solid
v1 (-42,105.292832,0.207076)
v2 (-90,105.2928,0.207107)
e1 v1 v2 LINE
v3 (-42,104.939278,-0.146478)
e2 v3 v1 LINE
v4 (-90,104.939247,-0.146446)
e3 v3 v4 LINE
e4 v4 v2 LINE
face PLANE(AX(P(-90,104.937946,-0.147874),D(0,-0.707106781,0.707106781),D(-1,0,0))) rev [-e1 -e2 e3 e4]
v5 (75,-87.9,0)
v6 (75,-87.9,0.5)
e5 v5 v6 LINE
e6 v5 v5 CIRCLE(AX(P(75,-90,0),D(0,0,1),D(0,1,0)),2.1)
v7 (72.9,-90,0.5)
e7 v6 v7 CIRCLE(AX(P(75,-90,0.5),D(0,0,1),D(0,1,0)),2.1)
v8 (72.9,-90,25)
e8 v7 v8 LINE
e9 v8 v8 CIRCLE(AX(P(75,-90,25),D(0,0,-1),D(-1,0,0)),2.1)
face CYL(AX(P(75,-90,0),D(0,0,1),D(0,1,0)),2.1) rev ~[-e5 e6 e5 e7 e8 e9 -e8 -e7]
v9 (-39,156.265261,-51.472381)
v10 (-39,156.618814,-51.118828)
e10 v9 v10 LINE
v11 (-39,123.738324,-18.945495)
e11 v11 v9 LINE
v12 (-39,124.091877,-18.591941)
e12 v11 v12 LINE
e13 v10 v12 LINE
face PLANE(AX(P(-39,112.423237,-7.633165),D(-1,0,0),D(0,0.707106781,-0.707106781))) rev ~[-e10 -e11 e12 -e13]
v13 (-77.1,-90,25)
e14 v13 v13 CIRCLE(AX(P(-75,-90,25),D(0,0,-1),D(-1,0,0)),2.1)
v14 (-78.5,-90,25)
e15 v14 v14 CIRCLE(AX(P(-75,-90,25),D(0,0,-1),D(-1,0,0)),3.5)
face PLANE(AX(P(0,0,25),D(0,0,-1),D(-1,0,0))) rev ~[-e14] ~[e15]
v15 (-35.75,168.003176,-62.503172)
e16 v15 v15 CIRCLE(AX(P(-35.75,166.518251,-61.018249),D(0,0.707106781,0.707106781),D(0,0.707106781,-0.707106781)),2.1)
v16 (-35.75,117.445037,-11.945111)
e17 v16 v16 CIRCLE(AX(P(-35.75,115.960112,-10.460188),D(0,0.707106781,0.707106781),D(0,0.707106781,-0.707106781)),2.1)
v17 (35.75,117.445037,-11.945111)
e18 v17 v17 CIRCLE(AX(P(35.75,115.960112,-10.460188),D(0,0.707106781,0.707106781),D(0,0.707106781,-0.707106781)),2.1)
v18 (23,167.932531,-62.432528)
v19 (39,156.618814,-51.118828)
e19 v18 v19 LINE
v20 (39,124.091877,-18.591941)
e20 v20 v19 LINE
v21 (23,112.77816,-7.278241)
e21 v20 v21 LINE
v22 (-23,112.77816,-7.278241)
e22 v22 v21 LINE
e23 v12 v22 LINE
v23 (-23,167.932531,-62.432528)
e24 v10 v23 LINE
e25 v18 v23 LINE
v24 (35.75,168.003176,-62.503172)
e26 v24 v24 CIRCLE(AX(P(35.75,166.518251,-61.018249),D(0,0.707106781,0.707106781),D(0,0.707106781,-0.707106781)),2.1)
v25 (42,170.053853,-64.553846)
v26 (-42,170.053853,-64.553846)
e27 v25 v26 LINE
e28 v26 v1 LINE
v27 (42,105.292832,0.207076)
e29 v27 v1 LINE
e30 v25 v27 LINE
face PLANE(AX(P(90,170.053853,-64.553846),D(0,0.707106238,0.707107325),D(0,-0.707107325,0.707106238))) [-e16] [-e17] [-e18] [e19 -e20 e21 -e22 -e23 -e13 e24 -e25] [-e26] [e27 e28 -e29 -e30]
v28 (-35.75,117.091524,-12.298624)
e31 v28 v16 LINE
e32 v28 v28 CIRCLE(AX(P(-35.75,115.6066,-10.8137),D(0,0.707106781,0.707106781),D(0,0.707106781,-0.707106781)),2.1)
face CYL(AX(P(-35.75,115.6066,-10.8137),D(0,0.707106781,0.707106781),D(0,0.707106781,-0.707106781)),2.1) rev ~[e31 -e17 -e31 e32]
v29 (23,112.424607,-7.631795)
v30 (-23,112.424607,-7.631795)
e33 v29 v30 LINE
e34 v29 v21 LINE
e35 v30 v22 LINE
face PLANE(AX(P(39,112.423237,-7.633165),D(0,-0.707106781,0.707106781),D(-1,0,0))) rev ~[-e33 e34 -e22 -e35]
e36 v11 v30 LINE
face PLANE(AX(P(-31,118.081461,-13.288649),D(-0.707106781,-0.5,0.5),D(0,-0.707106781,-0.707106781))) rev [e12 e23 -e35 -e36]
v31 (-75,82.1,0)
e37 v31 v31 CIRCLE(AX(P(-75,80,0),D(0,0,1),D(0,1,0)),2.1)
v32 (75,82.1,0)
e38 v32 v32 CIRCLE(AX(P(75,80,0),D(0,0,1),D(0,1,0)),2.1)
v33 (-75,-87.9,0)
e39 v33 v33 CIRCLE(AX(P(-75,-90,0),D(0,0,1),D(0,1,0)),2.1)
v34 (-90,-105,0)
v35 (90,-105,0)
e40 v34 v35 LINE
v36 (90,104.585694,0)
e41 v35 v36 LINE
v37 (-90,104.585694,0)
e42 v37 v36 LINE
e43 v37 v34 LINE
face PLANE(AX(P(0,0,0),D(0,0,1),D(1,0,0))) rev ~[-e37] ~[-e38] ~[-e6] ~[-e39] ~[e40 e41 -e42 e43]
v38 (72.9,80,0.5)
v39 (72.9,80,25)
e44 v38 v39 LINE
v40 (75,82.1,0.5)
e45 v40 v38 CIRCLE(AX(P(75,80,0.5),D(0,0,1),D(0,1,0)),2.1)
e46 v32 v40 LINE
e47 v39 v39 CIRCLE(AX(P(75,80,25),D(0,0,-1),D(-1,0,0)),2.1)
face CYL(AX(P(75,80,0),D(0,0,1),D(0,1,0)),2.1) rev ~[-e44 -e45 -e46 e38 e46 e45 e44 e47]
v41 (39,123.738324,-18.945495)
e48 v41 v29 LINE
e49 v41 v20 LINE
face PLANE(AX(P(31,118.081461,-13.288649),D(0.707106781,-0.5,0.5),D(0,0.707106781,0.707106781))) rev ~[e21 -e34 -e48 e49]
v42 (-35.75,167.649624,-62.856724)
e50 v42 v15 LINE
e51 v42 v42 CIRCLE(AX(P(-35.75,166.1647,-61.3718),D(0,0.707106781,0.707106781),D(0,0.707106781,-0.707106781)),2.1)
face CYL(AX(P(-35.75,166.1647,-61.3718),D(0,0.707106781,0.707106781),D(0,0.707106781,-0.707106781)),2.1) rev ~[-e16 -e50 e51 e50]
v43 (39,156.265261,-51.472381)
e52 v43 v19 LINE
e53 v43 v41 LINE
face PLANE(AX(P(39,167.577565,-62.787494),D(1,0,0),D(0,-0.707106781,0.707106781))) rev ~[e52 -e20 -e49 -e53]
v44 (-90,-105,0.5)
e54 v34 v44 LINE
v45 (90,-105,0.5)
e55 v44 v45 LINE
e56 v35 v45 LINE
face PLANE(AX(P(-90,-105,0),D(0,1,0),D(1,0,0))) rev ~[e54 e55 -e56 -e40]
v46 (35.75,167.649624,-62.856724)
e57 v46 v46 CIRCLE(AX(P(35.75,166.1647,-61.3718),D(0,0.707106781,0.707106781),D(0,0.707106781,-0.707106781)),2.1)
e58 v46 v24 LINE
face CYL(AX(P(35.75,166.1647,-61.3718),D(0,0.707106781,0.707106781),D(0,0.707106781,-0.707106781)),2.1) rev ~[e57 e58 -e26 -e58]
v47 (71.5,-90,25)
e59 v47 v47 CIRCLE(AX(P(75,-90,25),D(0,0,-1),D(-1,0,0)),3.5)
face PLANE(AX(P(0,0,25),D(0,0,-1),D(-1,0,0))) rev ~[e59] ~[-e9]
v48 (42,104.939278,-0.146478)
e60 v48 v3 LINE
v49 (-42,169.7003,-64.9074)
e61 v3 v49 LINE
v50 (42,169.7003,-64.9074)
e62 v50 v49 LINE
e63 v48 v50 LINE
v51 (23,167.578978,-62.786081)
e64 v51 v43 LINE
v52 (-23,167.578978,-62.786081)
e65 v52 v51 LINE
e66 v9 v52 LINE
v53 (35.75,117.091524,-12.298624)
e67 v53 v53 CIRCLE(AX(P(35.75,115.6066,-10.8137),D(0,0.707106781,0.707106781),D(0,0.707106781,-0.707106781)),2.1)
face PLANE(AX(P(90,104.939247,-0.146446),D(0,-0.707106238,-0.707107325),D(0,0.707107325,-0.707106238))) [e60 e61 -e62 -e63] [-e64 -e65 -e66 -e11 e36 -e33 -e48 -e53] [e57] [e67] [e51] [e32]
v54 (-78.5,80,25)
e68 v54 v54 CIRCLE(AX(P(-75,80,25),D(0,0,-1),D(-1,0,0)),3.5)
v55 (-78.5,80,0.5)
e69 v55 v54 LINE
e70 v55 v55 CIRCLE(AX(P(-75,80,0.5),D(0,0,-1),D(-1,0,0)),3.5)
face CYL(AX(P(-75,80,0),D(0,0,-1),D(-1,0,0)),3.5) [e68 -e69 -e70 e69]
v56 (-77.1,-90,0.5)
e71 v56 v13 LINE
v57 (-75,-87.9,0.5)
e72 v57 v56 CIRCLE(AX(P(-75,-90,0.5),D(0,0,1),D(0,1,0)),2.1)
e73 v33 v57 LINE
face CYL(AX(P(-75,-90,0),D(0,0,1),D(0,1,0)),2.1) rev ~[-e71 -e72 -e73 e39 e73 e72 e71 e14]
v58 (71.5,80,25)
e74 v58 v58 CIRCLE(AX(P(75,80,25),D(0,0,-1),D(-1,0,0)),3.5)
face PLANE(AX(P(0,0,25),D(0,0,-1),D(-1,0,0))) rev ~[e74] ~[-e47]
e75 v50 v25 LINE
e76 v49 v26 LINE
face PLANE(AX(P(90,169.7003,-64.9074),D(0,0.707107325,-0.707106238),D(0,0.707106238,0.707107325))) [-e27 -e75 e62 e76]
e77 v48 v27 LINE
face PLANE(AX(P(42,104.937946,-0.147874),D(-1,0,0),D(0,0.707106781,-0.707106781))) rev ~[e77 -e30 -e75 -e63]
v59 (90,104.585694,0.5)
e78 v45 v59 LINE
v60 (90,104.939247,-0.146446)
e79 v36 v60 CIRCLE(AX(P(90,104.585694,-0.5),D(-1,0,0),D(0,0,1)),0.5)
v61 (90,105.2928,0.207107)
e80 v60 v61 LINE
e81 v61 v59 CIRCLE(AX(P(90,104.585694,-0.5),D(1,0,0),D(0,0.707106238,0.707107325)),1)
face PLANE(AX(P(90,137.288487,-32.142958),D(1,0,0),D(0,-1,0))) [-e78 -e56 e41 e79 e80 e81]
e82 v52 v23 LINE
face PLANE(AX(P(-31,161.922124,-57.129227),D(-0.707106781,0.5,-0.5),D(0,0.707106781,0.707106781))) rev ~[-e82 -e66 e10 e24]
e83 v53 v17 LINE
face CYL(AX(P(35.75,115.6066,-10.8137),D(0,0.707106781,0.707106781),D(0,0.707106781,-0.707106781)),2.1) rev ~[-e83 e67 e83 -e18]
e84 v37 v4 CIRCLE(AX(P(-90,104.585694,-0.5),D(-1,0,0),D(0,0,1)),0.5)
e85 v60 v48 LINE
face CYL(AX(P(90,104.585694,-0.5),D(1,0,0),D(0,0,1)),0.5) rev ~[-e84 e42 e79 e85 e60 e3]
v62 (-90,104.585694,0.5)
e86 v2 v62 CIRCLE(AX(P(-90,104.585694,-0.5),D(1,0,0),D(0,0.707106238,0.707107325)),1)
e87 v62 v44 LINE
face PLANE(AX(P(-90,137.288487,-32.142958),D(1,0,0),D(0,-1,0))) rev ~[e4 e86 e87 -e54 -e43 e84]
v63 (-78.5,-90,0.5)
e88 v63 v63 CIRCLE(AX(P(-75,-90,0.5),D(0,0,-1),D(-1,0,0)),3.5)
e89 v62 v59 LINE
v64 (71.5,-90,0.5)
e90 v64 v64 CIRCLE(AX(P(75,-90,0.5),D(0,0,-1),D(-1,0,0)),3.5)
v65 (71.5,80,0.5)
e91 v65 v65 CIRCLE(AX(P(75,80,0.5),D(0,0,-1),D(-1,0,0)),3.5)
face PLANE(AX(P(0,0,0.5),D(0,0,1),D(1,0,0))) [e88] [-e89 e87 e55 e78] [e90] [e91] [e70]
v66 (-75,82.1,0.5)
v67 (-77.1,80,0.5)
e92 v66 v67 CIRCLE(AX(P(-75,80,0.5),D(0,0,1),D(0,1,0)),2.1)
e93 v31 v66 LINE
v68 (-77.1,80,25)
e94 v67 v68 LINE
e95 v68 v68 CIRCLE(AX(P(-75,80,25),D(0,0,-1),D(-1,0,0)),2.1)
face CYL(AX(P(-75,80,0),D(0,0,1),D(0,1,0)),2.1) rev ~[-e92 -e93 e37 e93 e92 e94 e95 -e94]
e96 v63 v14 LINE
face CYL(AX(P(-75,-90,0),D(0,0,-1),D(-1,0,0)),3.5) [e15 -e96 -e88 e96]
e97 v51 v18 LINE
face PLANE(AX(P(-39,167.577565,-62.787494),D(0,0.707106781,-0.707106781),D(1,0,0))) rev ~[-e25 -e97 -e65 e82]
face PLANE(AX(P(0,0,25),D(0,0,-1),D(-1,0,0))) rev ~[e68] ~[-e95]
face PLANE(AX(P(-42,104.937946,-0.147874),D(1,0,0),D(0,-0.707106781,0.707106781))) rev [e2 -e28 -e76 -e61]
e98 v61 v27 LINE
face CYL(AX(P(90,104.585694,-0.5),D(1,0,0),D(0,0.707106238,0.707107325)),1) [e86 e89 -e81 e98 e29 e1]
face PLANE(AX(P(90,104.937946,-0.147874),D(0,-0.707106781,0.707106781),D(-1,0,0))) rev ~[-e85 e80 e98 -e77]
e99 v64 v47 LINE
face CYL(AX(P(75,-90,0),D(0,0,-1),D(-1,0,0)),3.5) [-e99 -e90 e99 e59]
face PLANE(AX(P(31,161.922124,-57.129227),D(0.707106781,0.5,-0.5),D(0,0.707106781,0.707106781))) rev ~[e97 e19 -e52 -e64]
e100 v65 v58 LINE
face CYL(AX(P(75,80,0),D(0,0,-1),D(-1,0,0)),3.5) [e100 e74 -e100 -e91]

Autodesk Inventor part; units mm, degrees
ref_plane "YZ Plane" through (0, 0, 0) normal (1, 0, 0) x (0, 1, 0)
ref_plane "XZ Plane" through (0, 0, 0) normal (0, 1, 0) x (-1, 0, 0)
ref_plane "XY Plane" through (0, 0, 0) normal (0, 0, 1) x (1, 0, 0)
sketch "Sketch1" plane through (0, 0, 0) normal (0, 0, 1) x (1, 0, 0)
  line L0 (-90, -105) -> (90, -105)
  line L1 (90, -105) -> (90, 105)
  line L2 (-90, 105) -> (-90, -105)
  line L3 (42, 105) -> (42, 105)
  line L4 (42, 105) -> (-42, 105)
  line L5 (-42, 105) -> (-42, 105)
  line L6 (90, 105) -> (42, 105)
  line L7 (-42, 105) -> (-90, 105)
  point P0 (0, 0)
  dimension "d0" = 180
  dimension "d1" = 210
  dimension "d2" = 105
  dimension "d3" = 90
  dimension "d22" = 0
  dimension "d24" = 42
  dimension "d26" = 84
  dimension "d28" = 0
  dimension "d29" = 210
  dimension "d30" = 48
  dimension "d31" = 48
extrude "Plate1" add sketch "Sketch1" along normal blind 0.5
sketch "Sketch6" plane through (90, 104.6464, 0.1464) normal (0, 0.7071068, 0.7071068) x (-1, 0, 0)
  line L0 (180, 0) -> (0, 0)
  line L1 (0, 0) -> (0, -92)
  line L2 (0, -92) -> (180, -92)
  line L3 (180, -92) -> (180, 0)
edge flange "Flange1" height 92 angle 45 thickness 0.5 bend radius 0.5 thickness toward (0, 0.7071068, 0.7071068) relief tear relief width 0.5 relief depth 0.25 edges at (66, 105, 0) wall of the first edge with corners at (-90, 104.6464, 0.1464) (90, 104.6464, 0.1464) (90, 169.7003, -64.9074) (-90, 169.7003, -64.9074)
bend "Bend1"
corner "Corner1"
sketch "Sketch7" plane through (90, 169.7003, -64.9074) normal (0, -0.7071068, -0.7071068) x (-1, 0, 0)
  line L0 (180, 0) -> (0, 0) projected
  line L1 (180, -91.9393) -> (0, -91.9393) projected
  line L2 (180, -91.5858) -> (180, 0) projected
  line L3 (0, -91.5858) -> (0, 0) projected
  line L4 (0, -91.5858) -> (180, -91.5858) projected
  line L5 (0, -91.5858) -> (180, -91.5858) projected
  line L6 (180, -91.5858) -> (180, 0) projected
  line L7 (180, 0) -> (0, 0) projected
  line L8 (0, -91.5858) -> (0, 0) projected
  line L9 (0, -91.5858) -> (48, -91.5858)
  line L10 (48, -91.5858) -> (48, 0)
  line L11 (48, 0) -> (0, 0)
  line L12 (0, 0) -> (0, -91.5858)
  point P0 (90, -165.8927)
  dimension "d88" = 180
  dimension "d89" = 48
extrude "Extrusion4" cut sketch "Sketch7" against normal blind 10 contours L10 L4 L3 L0
mirror "Mirror1" about plane through (0, 0, 0) normal (1, 0, 0) of "Extrusion4"
sketch "Sketch8" plane through (42, 169.7003, -64.9074) normal (0, -0.7071068, -0.7071068) x (-1, 0, 0)
  line L0 (81, -3) -> (3, -3)
  line L1 (3, -3) -> (3, -81)
  line L2 (3, -81) -> (81, -81)
  line L3 (81, -81) -> (81, -3)
  line L4 (81, -3) -> (3, -81) construction
  line L5 (3, -3) -> (81, -81) construction
  line L6 (84, 0) -> (0, 0) projected
  point P0 (42, -165.8927)
  point P1 (42, -42)
  dimension "d92" = 78
  dimension "d93" = 0
  dimension "d94" = 3
  dimension "d111" = 78
extrude "Extrusion5" cut sketch "Sketch8" against normal blind 10
chamfer "Chamfer2" distance 16 angle 45 4 edges at (39, 112.6014, -7.455) (39, 167.7557, -62.6093) (-39, 167.7557, -62.6093) (-39, 112.6014, -7.455)
sketch "Sketch9" plane through (42, 169.7003, -64.9074) normal (0, -0.7071068, -0.7071068) x (-1, 0, 0)
  line L0 (77.75, -5) -> (6.25, -5) construction
  line L1 (6.25, -5) -> (6.25, -76.5) construction
  line L2 (6.25, -76.5) -> (77.75, -76.5) construction
  line L3 (77.75, -76.5) -> (77.75, -5) construction
  line L4 (77.75, -5) -> (6.25, -76.5) construction
  line L5 (6.25, -5) -> (77.75, -76.5) construction
  line L6 (84, 0) -> (0, 0) construction
  point P0 (42, -165.8927)
  point P1 (42, -40.75)
  dimension "d100" = 71.5
  dimension "d101" = 71.5
  dimension "d102" = 35.75
  dimension "d103" = 5
hole "Hole3" at (35.75, 166.1647, -61.3718) at (-35.75, 166.1647, -61.3718) at (-35.75, 115.6066, -10.8137) at (35.75, 115.6066, -10.8137) direction (0, 0.7071068, 0.7071068) diameter 4.2 end through all
sketch "Sketch10" plane through (0, 0, 0) normal (0, 0, -1) x (-1, 0, 0)
  line L0 (-75, -90) -> (75, -90) construction
  line L1 (75, -90) -> (75, 80) construction
  line L2 (75, 80) -> (-75, 80) construction
  line L3 (-75, 80) -> (-75, -90) construction
  line L4 (-75, -90) -> (75, 80) construction
  line L5 (75, -90) -> (-75, 80) construction
  line L6 (90, -105) -> (-90, -105) projected
  point P0 (0, -5)
  point P1 (0, 0)
  dimension "d112" = 170
  dimension "d113" = 150
  dimension "d114" = 75
  dimension "d115" = 15
hole "Hole4" at (75, 80, 0) at (75, -90, 0) at (-75, -90, 0) at (-75, 80, 0) direction (0, 0, 1) diameter 4.2 end through all
sketch "Sketch11" plane through (0, 0, 0) normal (0, 0, -1) x (-1, 0, 0)
  circle A0 centre (-75, 80) radius 2.1 projected
  circle A1 centre (-75, 80) radius 3.5
  circle A2 centre (-75, -90) radius 2.1 projected
  circle A3 centre (75, -90) radius 2.1 projected
  circle A4 centre (75, 80) radius 2.1 projected
  circle A5 centre (-75, -90) radius 3.5
  circle A6 centre (75, -90) radius 3.5
  circle A7 centre (75, 80) radius 3.5
  point P0 (0, 0)
  dimension "d123" = 7
  dimension "d124" = 7
  dimension "d125" = 7
  dimension "d126" = 7
extrude "Extrusion7" add sketch "Sketch11" against normal blind 25
equation "\"d111\" = d92"
equation "\"d101\" = d100"
equation "\"d102\" = 0.5 * d101"
equation "\"d109\" = Thickness"
equation "\"d114\" = 0.5 * d113"
equation "\"d121\" = Thickness"
equation "\"d74\" = Thickness"
equation "\"d75\" = BendReliefWidth"
equation "\"d76\" = BendReliefDepth"
equation "\"d77\" = MinimumRemnant"
equation "\"d78\" = TransitionRadius"
equation "\"d81\" = BendRadius"
equation "\"d82\" = CornerReliefSize"
equation "\"d83\" = GapSize"
equation "\"d84\" = JacobiRadiusSize"
equation "\"d2\" = 0.5 * d1"
equation "\"d3\" = 0.5 * d0"
equation "\"d24\" = 0.5 * d26"
equation "\"BendRadius\" = Thickness"
equation "\"BendReliefWidth\" = Thickness"
equation "\"BendReliefDepth\" = 0.5 * Thickness"
equation "\"CornerReliefSize\" = 4 * Thickness"
equation "\"MinimumRemnant\" = 2 * Thickness"
equation "\"TransitionRadius\" = BendRadius"
equation "\"JacobiRadiusSize\" = BendRadius"
equation "\"GapSize\" = Thickness"
equation "\"Thickness\" = 0.5"
properties part number "XGEN_hotbed-pcb"
